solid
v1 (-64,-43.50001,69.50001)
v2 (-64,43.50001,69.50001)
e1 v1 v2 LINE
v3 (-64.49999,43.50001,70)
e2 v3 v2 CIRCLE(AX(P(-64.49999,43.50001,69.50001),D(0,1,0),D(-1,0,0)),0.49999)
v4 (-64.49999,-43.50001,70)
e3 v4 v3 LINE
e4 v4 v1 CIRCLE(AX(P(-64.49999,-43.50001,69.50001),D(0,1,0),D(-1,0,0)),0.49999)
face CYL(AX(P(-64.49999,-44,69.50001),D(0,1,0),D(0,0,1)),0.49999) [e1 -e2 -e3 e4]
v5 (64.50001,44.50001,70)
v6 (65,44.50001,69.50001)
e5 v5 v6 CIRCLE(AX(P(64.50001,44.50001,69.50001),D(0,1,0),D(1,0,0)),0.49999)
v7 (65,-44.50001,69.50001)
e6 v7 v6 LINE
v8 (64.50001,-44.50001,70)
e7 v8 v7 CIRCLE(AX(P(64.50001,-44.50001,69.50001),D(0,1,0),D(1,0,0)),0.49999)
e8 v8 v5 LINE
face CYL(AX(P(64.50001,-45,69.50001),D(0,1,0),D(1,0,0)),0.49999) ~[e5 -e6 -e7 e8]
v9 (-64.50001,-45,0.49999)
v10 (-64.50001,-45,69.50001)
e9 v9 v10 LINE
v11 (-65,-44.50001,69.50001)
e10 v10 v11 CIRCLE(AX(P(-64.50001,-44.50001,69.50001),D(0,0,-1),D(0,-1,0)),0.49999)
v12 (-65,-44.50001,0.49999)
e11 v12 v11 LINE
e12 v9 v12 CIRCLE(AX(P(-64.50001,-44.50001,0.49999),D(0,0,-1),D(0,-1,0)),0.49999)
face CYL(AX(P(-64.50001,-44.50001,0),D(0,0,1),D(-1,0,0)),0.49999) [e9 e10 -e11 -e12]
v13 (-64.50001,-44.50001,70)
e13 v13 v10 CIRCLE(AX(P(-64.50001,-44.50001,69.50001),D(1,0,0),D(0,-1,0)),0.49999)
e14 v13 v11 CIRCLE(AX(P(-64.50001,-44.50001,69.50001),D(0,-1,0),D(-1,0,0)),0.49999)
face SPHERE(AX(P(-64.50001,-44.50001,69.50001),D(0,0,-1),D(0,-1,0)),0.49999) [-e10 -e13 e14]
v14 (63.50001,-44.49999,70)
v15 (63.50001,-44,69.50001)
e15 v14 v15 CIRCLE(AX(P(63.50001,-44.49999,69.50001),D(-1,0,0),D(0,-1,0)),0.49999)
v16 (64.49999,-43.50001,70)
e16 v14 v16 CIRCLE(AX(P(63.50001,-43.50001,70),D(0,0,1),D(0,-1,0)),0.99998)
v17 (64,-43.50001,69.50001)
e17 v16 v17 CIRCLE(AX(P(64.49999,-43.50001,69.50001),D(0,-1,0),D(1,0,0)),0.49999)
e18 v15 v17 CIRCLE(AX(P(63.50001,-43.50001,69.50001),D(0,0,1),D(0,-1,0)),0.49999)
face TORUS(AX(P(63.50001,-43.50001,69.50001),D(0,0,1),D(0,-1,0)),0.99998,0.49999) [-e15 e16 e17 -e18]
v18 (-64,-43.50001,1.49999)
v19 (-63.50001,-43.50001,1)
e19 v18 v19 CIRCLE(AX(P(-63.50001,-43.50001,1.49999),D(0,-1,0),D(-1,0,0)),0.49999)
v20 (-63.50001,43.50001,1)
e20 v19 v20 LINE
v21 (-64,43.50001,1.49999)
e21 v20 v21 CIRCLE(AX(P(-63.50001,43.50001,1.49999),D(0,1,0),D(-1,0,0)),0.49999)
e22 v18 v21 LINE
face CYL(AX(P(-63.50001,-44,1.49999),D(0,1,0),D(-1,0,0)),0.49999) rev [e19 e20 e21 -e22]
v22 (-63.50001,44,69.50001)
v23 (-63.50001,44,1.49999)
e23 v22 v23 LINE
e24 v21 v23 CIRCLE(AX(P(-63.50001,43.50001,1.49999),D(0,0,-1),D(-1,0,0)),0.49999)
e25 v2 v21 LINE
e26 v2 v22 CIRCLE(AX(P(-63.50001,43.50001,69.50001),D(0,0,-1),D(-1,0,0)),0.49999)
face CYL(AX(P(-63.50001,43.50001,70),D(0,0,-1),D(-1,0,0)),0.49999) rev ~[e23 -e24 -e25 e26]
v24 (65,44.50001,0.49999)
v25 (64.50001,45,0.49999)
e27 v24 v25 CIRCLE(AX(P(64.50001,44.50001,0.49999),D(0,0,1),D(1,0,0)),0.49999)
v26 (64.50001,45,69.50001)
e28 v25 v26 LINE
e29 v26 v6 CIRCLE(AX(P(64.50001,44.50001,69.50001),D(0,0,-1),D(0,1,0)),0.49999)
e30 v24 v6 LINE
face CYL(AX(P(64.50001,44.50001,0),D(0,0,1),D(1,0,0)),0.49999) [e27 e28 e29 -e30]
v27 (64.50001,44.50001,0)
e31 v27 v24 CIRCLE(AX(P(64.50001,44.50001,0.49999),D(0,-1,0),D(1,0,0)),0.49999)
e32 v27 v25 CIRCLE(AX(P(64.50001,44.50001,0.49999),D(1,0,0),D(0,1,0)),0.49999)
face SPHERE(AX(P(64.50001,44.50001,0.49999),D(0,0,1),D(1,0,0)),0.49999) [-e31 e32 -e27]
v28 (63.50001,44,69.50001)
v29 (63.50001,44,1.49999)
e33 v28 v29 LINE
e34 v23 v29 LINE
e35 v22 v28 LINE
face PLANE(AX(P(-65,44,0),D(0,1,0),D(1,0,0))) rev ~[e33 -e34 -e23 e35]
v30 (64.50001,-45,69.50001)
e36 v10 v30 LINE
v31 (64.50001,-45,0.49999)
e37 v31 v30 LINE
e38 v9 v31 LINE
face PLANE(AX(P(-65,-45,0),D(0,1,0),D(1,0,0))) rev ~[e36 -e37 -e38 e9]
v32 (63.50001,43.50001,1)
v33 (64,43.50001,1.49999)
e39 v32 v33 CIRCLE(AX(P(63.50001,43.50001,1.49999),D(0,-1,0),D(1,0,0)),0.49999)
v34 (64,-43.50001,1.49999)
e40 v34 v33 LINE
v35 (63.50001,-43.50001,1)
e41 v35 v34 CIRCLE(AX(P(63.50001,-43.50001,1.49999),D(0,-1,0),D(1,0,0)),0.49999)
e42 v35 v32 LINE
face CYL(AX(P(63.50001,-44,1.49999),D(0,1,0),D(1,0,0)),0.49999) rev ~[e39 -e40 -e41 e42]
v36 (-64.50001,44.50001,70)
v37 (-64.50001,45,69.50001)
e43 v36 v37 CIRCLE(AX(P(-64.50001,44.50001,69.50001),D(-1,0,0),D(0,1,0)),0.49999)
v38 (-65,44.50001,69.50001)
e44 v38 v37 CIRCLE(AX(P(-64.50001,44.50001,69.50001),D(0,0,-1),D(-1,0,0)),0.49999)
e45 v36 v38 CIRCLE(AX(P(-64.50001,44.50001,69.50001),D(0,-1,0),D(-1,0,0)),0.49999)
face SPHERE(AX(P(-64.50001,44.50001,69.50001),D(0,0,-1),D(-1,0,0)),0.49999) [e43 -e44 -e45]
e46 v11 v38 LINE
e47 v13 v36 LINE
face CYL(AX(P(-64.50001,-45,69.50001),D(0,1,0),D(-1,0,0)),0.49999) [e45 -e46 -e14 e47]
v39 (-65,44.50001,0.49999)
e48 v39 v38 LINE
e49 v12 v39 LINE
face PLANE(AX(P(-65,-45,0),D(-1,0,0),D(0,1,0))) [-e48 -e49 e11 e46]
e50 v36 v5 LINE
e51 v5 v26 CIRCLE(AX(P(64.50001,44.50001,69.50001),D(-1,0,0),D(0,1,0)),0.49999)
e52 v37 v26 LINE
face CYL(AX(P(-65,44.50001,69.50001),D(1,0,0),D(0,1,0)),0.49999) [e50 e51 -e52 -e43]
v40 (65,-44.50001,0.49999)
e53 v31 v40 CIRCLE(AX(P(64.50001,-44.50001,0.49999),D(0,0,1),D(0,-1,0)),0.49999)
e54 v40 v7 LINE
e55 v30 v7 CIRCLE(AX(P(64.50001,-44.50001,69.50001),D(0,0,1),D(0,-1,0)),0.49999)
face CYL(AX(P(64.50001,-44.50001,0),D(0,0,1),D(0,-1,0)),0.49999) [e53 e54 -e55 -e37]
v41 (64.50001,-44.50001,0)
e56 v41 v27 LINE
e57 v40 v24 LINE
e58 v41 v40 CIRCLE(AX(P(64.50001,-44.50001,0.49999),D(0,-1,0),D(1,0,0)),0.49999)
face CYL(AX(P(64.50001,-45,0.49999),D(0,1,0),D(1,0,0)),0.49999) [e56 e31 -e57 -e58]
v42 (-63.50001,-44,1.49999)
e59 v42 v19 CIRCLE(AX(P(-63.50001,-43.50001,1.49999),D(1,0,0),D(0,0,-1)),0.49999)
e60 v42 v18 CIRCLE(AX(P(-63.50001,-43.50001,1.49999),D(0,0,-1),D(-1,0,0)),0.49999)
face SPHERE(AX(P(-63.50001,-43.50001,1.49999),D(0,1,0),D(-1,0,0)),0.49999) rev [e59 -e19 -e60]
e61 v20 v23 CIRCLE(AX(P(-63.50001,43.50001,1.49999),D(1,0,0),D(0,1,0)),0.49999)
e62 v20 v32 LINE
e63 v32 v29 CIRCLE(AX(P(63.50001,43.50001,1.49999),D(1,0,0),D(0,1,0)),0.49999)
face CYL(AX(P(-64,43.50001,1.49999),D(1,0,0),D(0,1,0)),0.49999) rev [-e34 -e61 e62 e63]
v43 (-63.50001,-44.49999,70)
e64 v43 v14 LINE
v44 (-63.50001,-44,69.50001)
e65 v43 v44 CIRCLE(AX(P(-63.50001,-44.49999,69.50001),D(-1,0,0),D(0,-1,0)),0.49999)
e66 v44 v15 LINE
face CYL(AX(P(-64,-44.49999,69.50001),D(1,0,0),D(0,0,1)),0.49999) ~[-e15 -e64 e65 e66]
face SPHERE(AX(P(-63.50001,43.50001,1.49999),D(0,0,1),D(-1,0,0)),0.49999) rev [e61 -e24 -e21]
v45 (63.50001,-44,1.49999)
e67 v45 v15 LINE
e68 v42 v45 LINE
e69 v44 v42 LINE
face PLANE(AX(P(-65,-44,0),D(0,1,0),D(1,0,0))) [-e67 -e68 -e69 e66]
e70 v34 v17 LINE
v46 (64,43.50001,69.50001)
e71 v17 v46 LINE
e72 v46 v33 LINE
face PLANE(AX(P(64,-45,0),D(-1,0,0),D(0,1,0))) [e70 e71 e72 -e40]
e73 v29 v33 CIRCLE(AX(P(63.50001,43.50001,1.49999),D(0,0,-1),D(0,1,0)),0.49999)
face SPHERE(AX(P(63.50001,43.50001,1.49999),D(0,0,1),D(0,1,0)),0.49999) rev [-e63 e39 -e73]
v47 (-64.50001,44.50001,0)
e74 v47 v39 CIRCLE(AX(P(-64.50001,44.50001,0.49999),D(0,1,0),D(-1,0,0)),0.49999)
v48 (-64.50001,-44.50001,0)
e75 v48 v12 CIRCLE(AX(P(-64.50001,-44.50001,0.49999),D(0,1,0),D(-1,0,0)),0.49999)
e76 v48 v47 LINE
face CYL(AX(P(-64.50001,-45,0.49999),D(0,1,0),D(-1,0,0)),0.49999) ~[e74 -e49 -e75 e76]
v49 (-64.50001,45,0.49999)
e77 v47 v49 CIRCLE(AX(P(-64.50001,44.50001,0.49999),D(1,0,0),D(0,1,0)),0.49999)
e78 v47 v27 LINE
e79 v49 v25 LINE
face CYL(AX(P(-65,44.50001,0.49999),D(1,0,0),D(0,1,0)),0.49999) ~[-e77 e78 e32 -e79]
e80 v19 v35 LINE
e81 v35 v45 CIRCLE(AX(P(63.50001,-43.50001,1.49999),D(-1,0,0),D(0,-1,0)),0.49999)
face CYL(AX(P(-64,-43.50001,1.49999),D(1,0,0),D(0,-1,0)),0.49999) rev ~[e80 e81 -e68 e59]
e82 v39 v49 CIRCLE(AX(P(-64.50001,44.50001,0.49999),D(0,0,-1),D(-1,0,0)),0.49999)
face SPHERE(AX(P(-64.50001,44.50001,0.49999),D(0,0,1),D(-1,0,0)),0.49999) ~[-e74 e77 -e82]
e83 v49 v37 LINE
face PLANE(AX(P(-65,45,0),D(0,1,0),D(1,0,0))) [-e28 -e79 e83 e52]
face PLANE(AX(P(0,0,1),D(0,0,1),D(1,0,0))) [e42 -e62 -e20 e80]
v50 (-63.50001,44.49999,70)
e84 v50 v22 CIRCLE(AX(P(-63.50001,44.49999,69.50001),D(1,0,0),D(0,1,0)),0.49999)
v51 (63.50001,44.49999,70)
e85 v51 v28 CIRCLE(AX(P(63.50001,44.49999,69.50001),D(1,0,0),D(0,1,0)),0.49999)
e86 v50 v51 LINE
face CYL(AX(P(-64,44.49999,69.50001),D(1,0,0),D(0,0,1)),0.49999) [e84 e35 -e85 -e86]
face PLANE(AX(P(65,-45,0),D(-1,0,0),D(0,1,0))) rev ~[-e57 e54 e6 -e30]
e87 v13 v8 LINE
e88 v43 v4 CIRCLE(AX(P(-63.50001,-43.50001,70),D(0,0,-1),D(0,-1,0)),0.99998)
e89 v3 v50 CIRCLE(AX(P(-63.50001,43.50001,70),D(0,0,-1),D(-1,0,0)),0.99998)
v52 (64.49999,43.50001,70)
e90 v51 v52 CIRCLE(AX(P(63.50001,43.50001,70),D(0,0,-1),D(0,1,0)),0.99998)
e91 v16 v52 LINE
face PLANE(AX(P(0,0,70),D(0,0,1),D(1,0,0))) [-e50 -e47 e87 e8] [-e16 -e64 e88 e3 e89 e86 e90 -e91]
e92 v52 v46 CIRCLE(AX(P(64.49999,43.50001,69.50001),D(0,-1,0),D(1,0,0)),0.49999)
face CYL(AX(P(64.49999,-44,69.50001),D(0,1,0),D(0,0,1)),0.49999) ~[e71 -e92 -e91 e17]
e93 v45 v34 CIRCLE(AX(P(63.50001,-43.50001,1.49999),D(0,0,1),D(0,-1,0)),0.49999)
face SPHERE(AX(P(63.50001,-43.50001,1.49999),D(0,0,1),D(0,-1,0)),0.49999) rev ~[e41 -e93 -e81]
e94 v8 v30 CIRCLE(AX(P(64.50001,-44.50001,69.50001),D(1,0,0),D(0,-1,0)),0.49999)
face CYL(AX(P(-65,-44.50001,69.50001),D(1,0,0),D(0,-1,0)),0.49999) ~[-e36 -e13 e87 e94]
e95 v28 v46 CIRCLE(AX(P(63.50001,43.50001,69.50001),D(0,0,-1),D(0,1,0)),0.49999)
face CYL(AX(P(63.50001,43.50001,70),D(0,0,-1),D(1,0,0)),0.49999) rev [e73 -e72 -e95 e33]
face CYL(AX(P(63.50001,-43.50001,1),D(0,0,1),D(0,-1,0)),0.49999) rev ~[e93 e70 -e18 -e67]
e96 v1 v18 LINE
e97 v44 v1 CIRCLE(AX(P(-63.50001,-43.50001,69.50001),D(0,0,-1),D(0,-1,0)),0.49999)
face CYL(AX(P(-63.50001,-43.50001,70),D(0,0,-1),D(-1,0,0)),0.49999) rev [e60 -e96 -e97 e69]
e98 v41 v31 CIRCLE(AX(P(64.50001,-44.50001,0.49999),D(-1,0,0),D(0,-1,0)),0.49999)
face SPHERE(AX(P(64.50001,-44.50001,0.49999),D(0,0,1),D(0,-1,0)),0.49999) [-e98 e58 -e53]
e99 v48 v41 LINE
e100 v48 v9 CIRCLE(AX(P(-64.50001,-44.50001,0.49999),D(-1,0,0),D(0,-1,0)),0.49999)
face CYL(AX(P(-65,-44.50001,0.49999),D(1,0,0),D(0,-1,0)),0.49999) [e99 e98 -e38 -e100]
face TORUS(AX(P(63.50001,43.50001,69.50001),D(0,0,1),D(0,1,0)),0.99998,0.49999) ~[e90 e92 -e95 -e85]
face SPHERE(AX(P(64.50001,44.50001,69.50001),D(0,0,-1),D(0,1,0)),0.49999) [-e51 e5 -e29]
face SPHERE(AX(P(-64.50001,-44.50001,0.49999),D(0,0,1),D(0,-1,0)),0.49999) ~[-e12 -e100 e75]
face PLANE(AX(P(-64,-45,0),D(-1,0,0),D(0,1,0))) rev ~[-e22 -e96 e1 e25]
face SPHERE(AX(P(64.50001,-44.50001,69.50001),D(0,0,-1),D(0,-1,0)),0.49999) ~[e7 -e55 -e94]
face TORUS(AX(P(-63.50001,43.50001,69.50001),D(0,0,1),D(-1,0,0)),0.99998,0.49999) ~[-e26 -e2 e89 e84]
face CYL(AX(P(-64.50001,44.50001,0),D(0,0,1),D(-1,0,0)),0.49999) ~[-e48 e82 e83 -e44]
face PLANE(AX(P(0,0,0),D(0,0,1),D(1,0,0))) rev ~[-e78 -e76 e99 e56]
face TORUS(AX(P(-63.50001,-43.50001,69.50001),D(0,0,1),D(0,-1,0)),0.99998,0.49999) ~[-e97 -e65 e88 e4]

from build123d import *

# Parameters (mm, degrees)
F0_W     = 130
F0_H     = 90
F1_DEPTH = 70
F2_T     = -1
F3_R     = 0.49999


# Not quite as in the source:
# - a fillet or chamfer is up to 0.001 mm smaller than in the source, because OpenCascade refuses the exact size


with BuildPart() as f1:
    # F0 (on Top) → F1 (new body)
    with BuildSketch(Plane.XY):
        Rectangle(F0_W, F0_H)
    extrude(amount=F1_DEPTH)

    # F2
    f2_openings = [f1.faces().sort_by_distance(p)[0] for p in [
        (0, 0, 70),
    ]]
    offset(amount=F2_T, openings=f2_openings)

    # F3 (radius 0.5 in the source; OpenCascade refuses exactly that, so slightly less here)
    f3_edges = [f1.edges().sort_by_distance(p)[0] for p in [
        (-65, -45, 35),
        (65, -45, 35),
        (0, -45, 0),
        (0, -45, 70),
        (-65, 45, 35),
        (-65, 0, 0),
        (-65, 0, 70),
        (65, 45, 35),
        (64, 44, 35.5),
        (-64, 44, 35.5),
        (-64, 0, 70),
        (-64, 0, 1),
        (0, 45, 70),
        (65, 0, 0),
        (65, 0, 70),
        (0, 45, 0),
        (64, -44, 35.5),
        (-64, -44, 35.5),
        (0, -44, 1),
        (0, -44, 70),
        (0, 44, 1),
        (0, 44, 70),
        (64, 0, 1),
        (64, 0, 70),
    ]]
    fillet(f3_edges, radius=F3_R)


solid = f1.part
